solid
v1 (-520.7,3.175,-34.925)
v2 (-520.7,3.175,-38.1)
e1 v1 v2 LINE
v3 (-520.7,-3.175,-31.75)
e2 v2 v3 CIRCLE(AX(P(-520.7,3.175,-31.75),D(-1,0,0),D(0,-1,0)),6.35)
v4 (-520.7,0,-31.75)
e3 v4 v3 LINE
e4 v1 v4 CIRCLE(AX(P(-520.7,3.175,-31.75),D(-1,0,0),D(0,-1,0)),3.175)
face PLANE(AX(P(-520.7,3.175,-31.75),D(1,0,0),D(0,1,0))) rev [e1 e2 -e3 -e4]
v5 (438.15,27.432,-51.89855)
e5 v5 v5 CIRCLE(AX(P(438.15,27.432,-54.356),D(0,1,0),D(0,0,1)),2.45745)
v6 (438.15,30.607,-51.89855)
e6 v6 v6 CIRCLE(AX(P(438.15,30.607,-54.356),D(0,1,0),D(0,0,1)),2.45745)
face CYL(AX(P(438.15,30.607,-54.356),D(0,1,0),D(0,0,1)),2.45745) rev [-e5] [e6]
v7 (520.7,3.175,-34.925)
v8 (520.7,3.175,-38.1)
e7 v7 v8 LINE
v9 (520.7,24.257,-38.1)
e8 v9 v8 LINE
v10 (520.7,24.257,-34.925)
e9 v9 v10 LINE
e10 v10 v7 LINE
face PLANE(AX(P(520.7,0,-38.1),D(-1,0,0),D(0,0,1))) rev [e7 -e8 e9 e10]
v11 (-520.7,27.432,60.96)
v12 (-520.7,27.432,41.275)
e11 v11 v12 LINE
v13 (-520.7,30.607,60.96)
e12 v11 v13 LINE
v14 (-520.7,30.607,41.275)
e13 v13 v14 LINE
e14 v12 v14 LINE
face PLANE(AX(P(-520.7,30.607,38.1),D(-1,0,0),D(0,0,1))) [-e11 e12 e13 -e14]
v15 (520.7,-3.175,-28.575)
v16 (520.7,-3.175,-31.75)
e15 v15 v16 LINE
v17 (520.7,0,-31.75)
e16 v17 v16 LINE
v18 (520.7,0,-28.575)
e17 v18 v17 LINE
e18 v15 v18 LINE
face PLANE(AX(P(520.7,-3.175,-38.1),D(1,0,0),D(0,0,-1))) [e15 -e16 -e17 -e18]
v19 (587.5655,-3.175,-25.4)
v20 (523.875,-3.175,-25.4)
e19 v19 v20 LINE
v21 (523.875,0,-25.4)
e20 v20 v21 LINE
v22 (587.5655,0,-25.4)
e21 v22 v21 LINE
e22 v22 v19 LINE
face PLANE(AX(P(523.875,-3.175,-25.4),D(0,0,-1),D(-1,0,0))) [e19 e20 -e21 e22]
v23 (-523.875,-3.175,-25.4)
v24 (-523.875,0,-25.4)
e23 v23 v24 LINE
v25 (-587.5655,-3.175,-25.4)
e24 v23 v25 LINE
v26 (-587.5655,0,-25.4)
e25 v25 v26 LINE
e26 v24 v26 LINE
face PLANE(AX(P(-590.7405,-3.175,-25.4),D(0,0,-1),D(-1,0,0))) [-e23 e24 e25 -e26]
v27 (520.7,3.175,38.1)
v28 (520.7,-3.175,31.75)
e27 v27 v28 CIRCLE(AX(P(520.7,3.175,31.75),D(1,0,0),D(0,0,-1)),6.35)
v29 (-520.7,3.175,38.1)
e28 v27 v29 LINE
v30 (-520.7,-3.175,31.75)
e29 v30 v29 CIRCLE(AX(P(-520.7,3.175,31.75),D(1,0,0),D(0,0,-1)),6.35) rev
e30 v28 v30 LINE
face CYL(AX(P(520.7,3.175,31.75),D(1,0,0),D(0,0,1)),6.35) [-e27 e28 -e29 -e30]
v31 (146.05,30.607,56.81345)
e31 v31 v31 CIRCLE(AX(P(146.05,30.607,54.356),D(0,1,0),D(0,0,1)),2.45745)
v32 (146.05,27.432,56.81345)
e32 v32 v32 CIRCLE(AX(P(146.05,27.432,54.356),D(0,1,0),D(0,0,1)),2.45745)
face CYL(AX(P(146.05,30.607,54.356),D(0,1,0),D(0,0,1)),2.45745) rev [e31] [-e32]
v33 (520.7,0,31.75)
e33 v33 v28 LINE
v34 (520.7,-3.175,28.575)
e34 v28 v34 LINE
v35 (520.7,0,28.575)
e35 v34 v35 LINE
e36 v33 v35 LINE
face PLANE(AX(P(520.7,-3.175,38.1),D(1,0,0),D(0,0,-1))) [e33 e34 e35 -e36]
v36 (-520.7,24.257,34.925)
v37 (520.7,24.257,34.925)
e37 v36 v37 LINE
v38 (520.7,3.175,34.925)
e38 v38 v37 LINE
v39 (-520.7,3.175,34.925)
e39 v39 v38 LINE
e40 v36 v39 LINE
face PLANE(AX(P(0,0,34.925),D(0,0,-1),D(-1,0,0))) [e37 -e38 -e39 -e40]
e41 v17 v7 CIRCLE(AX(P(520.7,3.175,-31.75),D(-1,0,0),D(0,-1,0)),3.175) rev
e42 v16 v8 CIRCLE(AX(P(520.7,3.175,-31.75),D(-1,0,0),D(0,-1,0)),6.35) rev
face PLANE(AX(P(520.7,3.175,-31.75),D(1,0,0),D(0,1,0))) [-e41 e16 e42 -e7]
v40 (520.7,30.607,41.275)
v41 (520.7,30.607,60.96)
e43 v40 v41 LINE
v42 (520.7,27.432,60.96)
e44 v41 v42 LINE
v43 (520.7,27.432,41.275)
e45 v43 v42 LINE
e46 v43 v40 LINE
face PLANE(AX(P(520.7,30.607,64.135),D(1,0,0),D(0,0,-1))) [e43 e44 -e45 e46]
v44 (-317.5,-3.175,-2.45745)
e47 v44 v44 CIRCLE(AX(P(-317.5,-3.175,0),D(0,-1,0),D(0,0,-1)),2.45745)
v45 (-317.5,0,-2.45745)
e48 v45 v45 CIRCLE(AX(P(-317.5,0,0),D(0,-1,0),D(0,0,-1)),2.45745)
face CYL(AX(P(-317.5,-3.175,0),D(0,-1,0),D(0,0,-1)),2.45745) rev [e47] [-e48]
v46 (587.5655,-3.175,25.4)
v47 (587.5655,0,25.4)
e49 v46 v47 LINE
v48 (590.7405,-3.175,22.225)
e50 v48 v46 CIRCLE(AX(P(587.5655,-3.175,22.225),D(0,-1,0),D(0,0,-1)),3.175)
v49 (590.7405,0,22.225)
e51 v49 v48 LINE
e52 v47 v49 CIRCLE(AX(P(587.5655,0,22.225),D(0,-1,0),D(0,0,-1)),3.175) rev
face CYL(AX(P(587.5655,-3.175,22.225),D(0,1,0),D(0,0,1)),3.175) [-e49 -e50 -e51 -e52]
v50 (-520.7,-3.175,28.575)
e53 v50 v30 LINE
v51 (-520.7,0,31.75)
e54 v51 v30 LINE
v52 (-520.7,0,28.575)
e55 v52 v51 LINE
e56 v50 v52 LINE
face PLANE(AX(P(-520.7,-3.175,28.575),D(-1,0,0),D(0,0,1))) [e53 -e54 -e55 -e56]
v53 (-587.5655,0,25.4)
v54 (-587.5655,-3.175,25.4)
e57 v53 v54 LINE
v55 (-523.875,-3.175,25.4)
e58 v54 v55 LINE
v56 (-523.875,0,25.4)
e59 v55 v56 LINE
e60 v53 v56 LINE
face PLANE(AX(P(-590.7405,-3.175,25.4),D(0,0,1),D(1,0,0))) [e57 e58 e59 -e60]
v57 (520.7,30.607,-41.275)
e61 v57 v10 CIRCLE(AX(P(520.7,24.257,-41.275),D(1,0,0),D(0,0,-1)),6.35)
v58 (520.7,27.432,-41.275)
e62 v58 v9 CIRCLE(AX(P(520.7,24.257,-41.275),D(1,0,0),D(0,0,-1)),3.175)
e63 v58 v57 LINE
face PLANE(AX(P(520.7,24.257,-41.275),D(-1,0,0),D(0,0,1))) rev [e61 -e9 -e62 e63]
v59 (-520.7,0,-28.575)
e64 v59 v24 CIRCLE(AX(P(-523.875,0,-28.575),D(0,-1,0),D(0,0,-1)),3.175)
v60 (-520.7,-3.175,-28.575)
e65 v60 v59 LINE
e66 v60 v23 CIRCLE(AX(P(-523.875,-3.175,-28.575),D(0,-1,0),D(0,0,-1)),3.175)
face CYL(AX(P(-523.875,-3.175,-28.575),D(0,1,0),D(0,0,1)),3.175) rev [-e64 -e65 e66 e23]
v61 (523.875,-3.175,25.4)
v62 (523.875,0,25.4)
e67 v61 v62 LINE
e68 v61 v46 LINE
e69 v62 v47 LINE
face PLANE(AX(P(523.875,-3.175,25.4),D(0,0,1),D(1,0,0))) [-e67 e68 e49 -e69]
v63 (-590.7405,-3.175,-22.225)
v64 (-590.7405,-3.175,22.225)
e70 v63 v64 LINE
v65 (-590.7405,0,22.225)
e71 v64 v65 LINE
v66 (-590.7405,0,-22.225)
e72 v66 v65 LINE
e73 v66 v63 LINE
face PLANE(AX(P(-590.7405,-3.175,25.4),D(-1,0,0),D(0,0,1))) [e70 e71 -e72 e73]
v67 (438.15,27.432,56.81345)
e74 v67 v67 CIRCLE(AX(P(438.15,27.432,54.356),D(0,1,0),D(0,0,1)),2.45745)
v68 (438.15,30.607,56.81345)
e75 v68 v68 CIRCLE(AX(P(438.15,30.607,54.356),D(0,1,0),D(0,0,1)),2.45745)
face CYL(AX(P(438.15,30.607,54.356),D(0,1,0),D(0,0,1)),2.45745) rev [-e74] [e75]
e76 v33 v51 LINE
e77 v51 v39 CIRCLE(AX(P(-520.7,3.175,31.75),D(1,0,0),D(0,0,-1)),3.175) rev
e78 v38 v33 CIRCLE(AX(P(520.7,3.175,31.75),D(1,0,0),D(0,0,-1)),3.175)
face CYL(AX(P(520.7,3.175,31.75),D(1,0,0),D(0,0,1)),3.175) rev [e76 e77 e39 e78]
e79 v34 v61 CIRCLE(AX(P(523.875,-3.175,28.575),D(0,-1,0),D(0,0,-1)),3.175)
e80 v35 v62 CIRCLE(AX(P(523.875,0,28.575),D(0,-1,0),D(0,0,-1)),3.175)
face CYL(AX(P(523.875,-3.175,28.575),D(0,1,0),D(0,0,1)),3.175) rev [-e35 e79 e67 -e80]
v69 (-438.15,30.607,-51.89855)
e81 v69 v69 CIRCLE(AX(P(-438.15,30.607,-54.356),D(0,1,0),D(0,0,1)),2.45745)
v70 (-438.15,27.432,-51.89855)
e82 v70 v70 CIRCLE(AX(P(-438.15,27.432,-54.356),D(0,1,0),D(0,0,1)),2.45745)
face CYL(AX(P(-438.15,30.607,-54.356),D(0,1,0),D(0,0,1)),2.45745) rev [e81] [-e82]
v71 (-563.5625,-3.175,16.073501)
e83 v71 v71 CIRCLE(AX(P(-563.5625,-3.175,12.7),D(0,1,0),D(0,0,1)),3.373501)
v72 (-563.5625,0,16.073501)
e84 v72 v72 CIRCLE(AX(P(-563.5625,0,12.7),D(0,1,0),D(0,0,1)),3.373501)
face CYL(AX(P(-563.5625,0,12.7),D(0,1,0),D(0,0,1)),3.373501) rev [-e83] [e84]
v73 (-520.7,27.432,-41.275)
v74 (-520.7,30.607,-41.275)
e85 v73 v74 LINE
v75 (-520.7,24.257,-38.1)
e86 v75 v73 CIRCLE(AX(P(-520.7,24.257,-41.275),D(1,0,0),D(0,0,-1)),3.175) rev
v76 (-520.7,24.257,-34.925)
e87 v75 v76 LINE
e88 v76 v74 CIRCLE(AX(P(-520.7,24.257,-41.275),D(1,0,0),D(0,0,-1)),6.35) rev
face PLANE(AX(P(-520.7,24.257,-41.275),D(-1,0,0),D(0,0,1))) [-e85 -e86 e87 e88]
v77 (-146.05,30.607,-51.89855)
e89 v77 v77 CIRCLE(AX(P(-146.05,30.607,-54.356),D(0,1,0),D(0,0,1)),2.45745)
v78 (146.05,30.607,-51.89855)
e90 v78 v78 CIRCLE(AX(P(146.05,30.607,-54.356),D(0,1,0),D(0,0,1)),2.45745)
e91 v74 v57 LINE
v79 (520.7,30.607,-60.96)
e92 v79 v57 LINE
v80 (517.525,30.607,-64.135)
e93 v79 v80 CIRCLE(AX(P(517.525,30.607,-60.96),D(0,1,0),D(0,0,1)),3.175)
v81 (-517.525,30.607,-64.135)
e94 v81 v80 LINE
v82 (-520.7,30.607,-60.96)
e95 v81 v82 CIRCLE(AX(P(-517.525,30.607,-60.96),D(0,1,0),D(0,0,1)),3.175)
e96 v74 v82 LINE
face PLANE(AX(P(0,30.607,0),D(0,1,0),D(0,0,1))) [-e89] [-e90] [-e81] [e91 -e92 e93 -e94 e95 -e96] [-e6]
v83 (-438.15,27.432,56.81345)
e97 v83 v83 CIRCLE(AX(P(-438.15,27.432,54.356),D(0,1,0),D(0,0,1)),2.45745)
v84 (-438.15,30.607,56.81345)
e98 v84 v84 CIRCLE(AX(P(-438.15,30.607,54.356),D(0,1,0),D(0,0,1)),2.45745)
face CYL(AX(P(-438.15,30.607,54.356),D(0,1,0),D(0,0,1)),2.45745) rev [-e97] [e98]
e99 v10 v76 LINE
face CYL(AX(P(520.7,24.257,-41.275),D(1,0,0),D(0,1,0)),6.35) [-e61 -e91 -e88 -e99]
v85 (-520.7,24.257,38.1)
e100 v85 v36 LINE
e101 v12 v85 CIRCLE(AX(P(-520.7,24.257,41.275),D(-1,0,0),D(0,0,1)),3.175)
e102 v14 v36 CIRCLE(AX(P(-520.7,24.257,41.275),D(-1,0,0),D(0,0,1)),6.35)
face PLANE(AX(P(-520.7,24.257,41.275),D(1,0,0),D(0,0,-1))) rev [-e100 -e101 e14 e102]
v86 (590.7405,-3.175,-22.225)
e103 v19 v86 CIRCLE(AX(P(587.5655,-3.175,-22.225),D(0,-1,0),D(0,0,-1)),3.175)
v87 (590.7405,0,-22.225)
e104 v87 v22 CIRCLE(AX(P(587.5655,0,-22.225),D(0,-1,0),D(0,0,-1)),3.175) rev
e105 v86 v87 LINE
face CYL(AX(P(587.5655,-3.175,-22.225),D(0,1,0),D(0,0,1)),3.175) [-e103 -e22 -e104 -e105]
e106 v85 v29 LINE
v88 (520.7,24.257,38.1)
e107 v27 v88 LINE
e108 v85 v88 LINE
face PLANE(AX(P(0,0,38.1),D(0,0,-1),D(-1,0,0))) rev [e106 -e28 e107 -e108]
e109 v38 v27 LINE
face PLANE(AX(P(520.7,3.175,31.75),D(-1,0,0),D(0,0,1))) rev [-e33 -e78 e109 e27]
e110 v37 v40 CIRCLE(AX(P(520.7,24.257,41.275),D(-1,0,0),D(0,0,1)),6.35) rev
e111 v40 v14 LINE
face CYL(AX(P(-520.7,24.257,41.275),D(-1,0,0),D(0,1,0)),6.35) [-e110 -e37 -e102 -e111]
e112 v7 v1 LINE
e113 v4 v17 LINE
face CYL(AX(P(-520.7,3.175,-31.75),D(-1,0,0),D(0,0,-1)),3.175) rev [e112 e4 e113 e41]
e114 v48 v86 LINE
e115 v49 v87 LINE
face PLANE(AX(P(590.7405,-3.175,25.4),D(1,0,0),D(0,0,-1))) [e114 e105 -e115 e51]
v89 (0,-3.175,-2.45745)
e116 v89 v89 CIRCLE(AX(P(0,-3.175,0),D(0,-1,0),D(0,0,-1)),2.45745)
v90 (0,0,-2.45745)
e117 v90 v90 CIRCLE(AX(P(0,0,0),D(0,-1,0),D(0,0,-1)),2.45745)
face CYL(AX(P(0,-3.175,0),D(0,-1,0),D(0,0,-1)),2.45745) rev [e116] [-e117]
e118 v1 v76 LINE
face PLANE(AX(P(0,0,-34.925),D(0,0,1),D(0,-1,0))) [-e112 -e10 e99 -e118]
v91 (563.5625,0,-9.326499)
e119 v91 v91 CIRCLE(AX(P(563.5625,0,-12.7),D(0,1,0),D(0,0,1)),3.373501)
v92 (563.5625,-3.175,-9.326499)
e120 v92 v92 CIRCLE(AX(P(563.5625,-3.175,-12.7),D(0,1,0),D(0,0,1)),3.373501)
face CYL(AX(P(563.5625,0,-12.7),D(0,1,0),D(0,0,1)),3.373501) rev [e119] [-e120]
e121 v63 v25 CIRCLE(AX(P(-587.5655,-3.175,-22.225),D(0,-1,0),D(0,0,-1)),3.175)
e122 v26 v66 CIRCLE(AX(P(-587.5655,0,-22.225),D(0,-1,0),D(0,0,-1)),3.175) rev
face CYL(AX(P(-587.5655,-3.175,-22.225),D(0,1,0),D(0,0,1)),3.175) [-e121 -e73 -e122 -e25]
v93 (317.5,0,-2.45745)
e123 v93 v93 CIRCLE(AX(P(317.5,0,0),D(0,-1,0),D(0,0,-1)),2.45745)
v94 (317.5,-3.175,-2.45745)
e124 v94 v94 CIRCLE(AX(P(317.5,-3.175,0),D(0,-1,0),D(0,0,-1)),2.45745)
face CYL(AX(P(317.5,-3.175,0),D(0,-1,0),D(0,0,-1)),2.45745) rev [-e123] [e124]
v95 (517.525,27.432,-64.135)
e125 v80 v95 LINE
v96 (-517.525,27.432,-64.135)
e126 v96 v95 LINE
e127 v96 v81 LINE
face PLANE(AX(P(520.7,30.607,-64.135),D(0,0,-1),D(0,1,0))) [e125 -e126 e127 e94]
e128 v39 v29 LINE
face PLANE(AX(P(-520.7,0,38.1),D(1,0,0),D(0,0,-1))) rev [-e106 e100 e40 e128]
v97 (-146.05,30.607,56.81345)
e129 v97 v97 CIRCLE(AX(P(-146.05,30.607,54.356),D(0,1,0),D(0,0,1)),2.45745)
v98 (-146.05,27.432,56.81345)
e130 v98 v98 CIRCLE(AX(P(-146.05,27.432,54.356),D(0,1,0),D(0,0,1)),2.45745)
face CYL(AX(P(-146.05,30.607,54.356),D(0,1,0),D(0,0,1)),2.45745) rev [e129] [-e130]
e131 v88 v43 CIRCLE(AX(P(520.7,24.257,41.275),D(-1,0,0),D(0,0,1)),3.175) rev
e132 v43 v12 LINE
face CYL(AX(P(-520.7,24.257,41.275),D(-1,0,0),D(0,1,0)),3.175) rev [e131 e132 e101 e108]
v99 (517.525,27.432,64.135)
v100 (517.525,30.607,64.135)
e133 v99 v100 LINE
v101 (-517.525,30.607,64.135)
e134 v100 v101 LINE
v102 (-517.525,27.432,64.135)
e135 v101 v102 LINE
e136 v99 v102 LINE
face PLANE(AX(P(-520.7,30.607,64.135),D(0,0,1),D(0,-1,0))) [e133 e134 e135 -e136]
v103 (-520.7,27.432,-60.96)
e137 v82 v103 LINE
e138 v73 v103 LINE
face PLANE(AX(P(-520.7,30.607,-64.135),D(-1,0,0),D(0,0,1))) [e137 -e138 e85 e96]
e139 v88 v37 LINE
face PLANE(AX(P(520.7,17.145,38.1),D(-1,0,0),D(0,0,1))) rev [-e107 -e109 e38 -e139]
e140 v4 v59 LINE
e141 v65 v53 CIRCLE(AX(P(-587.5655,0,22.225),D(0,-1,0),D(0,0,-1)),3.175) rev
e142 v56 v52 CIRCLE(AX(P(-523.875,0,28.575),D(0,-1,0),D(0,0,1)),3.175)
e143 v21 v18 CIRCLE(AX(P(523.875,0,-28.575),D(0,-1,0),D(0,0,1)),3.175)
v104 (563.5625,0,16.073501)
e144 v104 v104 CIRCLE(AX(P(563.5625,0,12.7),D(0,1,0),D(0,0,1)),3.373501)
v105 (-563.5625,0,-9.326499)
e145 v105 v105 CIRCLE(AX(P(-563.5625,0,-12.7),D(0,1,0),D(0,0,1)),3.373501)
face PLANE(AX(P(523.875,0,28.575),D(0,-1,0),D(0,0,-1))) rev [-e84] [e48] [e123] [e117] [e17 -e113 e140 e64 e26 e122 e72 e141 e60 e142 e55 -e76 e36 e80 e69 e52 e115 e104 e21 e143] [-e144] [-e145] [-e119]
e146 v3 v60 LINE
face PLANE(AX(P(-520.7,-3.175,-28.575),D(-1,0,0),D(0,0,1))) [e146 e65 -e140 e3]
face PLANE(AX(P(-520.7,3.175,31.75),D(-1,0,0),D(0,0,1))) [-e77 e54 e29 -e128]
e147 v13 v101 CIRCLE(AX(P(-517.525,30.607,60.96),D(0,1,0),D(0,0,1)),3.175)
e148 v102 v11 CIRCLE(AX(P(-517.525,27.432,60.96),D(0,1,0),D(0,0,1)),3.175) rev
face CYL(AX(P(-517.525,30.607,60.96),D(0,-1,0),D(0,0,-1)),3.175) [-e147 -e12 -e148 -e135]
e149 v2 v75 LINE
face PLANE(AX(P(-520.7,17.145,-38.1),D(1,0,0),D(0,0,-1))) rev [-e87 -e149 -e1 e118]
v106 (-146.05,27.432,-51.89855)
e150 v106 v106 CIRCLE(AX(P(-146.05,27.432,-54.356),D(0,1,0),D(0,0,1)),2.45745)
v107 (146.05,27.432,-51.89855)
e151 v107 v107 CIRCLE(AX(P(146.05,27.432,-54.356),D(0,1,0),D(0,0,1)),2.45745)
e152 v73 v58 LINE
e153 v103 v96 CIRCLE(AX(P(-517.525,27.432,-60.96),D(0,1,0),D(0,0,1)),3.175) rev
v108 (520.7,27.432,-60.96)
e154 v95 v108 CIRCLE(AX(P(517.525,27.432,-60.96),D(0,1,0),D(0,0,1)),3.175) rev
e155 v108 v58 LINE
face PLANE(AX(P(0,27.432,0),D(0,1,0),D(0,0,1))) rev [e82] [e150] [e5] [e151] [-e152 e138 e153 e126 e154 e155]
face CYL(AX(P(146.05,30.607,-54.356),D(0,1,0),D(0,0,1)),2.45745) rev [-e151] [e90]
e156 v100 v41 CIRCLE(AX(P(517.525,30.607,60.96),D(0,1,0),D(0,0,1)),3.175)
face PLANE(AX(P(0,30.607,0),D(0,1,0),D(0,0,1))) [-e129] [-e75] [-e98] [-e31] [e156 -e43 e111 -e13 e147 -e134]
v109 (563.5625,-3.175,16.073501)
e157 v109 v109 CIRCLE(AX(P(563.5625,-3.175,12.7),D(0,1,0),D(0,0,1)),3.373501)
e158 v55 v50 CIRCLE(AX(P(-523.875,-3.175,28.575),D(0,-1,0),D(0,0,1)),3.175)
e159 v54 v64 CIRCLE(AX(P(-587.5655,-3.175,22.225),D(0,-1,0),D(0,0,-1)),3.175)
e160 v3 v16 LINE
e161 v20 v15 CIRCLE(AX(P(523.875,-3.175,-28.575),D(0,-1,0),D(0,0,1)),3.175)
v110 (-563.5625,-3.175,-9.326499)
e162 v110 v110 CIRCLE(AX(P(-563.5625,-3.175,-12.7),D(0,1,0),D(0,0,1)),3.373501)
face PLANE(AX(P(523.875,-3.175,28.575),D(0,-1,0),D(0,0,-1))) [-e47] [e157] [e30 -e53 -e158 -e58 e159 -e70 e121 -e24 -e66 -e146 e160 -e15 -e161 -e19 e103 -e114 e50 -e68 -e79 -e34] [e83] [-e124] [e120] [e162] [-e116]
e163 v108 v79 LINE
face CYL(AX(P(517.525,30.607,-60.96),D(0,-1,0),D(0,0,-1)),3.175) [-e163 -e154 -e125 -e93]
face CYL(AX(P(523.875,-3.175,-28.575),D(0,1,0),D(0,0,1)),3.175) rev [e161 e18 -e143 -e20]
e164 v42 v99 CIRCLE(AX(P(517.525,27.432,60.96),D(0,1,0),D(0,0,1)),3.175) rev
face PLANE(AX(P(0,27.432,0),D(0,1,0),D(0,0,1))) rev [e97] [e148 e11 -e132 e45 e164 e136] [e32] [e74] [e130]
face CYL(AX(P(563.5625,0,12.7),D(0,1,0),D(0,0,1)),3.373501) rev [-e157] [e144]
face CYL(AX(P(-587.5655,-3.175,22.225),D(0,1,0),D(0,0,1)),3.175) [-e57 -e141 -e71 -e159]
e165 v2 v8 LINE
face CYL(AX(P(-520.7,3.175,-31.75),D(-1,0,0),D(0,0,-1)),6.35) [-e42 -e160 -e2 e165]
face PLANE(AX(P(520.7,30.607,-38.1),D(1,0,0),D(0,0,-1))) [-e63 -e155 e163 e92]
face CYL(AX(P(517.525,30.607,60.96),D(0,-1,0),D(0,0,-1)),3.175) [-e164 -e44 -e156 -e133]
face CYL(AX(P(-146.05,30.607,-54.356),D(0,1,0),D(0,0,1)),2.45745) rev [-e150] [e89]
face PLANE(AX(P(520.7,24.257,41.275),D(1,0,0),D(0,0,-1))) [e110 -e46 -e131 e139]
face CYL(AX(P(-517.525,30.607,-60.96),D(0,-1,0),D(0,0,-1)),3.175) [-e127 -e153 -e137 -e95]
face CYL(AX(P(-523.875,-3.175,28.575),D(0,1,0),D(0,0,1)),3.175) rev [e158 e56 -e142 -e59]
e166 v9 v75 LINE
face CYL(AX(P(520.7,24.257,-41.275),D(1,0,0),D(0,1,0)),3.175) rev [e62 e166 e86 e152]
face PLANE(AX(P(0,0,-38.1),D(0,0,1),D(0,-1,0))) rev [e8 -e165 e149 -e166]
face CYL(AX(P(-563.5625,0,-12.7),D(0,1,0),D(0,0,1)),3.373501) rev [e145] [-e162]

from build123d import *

# Parameters (mm, degrees)
BASE_FLANGE2_DEPTH                     = 3.175
EDGE_FLANGE1_STRIP_W                   = 19.05
EDGE_FLANGE1_STRIP_H                   = 3.175
EDGE_FLANGE1_STRIP_CUT_DEPTH           = 1041.4
EDGE_FLANGE1_STRIP_2_W                 = 19.05
EDGE_FLANGE1_STRIP_2_H                 = 3.175
EDGE_FLANGE1_STRIP_CUT_2_DEPTH         = 1041.4
EDGE_FLANGE1_DEPTH                     = 1041.4
EDGE_FLANGE1_BEND_DEPTH                = 1041.4
EDGE_FLANGE3_START                     = -520.7
EDGE_FLANGE3_DEPTH                     = 1041.4
F_10_0_1935_DIAMETER_HOLE1_D           = 4.9149
F_10_0_1935_DIAMETER_HOLE1_ON_FACE_2_D = 4.9149
F_10_0_1935_DIAMETER_HOLE1_ON_FACE_3_D = 4.9149
F_17_64_0_26563_DIAMETER_HOLE1_D       = 6.747002
FILLET1_R                              = 3.175


# Read off the part's stored shape, not the designer's step: Edge-Flange3
# Sheet-metal steps are written as plain solids
with BuildPart() as part:
    # Sketch1 → Base-Flange2 (new body)
    with BuildSketch(Plane(origin=(0, 0, 0), x_dir=(1, 0, 0), z_dir=(0, 1, 0))):
        with BuildLine():
            Line((-520.7, 28.575), (-520.7, 38.1))
            Line((-520.7, 38.1), (520.7, 38.1))
            Line((520.7, 38.1), (520.7, 28.575))
            ThreePointArc((520.7, 28.575), (521.62993597, 26.32993597), (523.875, 25.4))
            Line((523.875, 25.4), (590.7405, 25.4))
            Line((590.7405, 25.4), (590.7405, -25.4))
            Line((590.7405, -25.4), (523.875, -25.4))
            ThreePointArc((523.875, -25.4), (521.62993597, -26.32993597), (520.7, -28.575))
            Line((520.7, -28.575), (520.7, -38.1))
            Line((520.7, -38.1), (-520.7, -38.1))
            Line((-520.7, -38.1), (-520.7, -28.575))
            ThreePointArc((-520.7, -28.575), (-521.62993597, -26.32993597), (-523.875, -25.4))
            Line((-523.875, -25.4), (-590.7405, -25.4))
            Line((-590.7405, -25.4), (-590.7405, 25.4))
            Line((-590.7405, 25.4), (-523.875, 25.4))
            ThreePointArc((-523.875, 25.4), (-521.62993597, 26.32993597), (-520.7, 28.575))
        make_face()
    extrude(amount=-BASE_FLANGE2_DEPTH)

    # Edge-Flange1 strip (across the edge) → Edge-Flange1 strip cut (cut)
    with BuildSketch(Plane(origin=(-520.7, 0, 38.1), x_dir=(0, 0, -1), z_dir=(1, 0, 0))):
        with Locations((-3.175, -1.5875)):
            Rectangle(EDGE_FLANGE1_STRIP_W, EDGE_FLANGE1_STRIP_H)
    extrude(amount=EDGE_FLANGE1_STRIP_CUT_DEPTH, mode=Mode.SUBTRACT)

    # Edge-Flange1 strip 2 (across the edge) → Edge-Flange1 strip cut 2 (cut)
    with BuildSketch(Plane(origin=(520.7, 0, -38.1), x_dir=(0, 0, 1), z_dir=(-1, 0, 0))):
        with Locations((-3.175, -1.5875)):
            Rectangle(EDGE_FLANGE1_STRIP_2_W, EDGE_FLANGE1_STRIP_2_H)
    extrude(amount=EDGE_FLANGE1_STRIP_CUT_2_DEPTH, mode=Mode.SUBTRACT)

    # Edge-Flange1 section (across the edge) → Edge-Flange1 (add)
    with BuildSketch(Plane(origin=(-520.7, 0, 38.1), x_dir=(0, 0, -1), z_dir=(1, 0, 0))):
        with BuildLine():
            Line((0, 3.175), (0, 17.145))
            Line((0, 17.145), (3.175, 17.145))
            Line((3.175, 17.145), (3.175, 3.175))
            ThreePointArc((3.175, 3.175), (4.10493597, 0.92993597), (6.35, 0))
            Line((6.35, 0), (6.35, -3.175))
            ThreePointArc((6.35, -3.175), (1.859871939, -1.315128061), (0, 3.175))
        make_face()
    extrude(amount=EDGE_FLANGE1_DEPTH)

    # Edge-Flange1 section 2 (across the edge) → Edge-Flange1 bend (add)
    with BuildSketch(Plane(origin=(520.7, 0, -38.1), x_dir=(0, 0, 1), z_dir=(-1, 0, 0))):
        with BuildLine():
            Line((0, 3.175), (0, 17.145))
            Line((0, 17.145), (3.175, 17.145))
            Line((3.175, 17.145), (3.175, 3.175))
            ThreePointArc((3.175, 3.175), (4.10493597, 0.92993597), (6.35, 0))
            Line((6.35, 0), (6.35, -3.175))
            ThreePointArc((6.35, -3.175), (1.859871939, -1.315128061), (0, 3.175))
        make_face()
    extrude(amount=EDGE_FLANGE1_BEND_DEPTH)

    # Edge-Flange3 outline → Edge-Flange3 (add)
    with BuildSketch(Plane.YZ.offset(EDGE_FLANGE3_START)):
        with BuildLine():
            Line((24.257, 38.1), (17.145, 38.1))
            Line((17.145, 38.1), (17.145, 34.925))
            Line((17.145, 34.925), (24.257, 34.925))
            ThreePointArc((24.257, 34.925), (28.747128061, 36.784871939), (30.607, 41.275))
            Line((30.607, 41.275), (30.607, 64.135))
            Line((30.607, 64.135), (27.432, 64.135))
            Line((27.432, 64.135), (27.432, 41.275))
            ThreePointArc((27.432, 41.275), (26.50206403, 39.02993597), (24.257, 38.1))
        make_face()
        with BuildLine():
            Line((17.145, -38.1), (24.257, -38.1))
            ThreePointArc((24.257, -38.1), (26.50206403, -39.02993597), (27.432, -41.275))
            Line((27.432, -41.275), (27.432, -64.135))
            Line((27.432, -64.135), (30.607, -64.135))
            Line((30.607, -64.135), (30.607, -41.275))
            ThreePointArc((30.607, -41.275), (28.747128061, -36.784871939), (24.257, -34.925))
            Line((24.257, -34.925), (17.145, -34.925))
            Line((17.145, -34.925), (17.145, -38.1))
        make_face()
    extrude(amount=EDGE_FLANGE3_DEPTH)

    # #10 (0.1935) Diameter Hole1 (through all)
    with Locations(Plane(origin=(-317.5, -3.175, 0), x_dir=(0, 0, -1), z_dir=(0, -1, 0))):
        with Locations((0, 0), (0, 635), (0, 317.5)):
            Hole(F_10_0_1935_DIAMETER_HOLE1_D / 2)

    # #10 (0.1935) Diameter Hole1 on face 2 (through all)
    with Locations(Plane.ZX):
        with Locations((0, 0)):
            Hole(F_10_0_1935_DIAMETER_HOLE1_ON_FACE_2_D / 2)

    # #10 (0.1935) Diameter Hole1 on face 3 (through all)
    with Locations(Plane(origin=(-438.15, 30.607, -54.356), x_dir=(0, 0, 1), z_dir=(0, 1, 0))):
        with Locations((0, 0), (0, 292.1), (0, 584.2), (0, 876.3), (108.712, 0), (108.712, 292.1), (108.712, 584.2), (108.712, 876.3)):
            Hole(F_10_0_1935_DIAMETER_HOLE1_ON_FACE_3_D / 2)

    # 17/64 (0.26563) Diameter Hole1 (through all)
    with Locations(Plane(origin=(-563.5625, 0, -12.7), x_dir=(0, 0, 1), z_dir=(0, 1, 0))):
        with Locations((0, 0), (25.4, 0), (0, 1127.125), (25.4, 1127.125)):
            Hole(F_17_64_0_26563_DIAMETER_HOLE1_D / 2)

    # Fillet1
    fillet1_edges = [part.edges().sort_by_distance(p)[0] for p in [
        (520.7, 29.0195, 64.135),
        (-520.7, 29.0195, 64.135),
        (-520.7, 29.0195, -64.135),
        (520.7, 29.0195, -64.135),
        (590.7405, -1.5875, -25.4),
        (590.7405, -1.5875, 25.4),
        (-590.7405, -1.5875, 25.4),
        (-590.7405, -1.5875, -25.4),
    ]]
    fillet(fillet1_edges, radius=FILLET1_R)


solid = part.part
